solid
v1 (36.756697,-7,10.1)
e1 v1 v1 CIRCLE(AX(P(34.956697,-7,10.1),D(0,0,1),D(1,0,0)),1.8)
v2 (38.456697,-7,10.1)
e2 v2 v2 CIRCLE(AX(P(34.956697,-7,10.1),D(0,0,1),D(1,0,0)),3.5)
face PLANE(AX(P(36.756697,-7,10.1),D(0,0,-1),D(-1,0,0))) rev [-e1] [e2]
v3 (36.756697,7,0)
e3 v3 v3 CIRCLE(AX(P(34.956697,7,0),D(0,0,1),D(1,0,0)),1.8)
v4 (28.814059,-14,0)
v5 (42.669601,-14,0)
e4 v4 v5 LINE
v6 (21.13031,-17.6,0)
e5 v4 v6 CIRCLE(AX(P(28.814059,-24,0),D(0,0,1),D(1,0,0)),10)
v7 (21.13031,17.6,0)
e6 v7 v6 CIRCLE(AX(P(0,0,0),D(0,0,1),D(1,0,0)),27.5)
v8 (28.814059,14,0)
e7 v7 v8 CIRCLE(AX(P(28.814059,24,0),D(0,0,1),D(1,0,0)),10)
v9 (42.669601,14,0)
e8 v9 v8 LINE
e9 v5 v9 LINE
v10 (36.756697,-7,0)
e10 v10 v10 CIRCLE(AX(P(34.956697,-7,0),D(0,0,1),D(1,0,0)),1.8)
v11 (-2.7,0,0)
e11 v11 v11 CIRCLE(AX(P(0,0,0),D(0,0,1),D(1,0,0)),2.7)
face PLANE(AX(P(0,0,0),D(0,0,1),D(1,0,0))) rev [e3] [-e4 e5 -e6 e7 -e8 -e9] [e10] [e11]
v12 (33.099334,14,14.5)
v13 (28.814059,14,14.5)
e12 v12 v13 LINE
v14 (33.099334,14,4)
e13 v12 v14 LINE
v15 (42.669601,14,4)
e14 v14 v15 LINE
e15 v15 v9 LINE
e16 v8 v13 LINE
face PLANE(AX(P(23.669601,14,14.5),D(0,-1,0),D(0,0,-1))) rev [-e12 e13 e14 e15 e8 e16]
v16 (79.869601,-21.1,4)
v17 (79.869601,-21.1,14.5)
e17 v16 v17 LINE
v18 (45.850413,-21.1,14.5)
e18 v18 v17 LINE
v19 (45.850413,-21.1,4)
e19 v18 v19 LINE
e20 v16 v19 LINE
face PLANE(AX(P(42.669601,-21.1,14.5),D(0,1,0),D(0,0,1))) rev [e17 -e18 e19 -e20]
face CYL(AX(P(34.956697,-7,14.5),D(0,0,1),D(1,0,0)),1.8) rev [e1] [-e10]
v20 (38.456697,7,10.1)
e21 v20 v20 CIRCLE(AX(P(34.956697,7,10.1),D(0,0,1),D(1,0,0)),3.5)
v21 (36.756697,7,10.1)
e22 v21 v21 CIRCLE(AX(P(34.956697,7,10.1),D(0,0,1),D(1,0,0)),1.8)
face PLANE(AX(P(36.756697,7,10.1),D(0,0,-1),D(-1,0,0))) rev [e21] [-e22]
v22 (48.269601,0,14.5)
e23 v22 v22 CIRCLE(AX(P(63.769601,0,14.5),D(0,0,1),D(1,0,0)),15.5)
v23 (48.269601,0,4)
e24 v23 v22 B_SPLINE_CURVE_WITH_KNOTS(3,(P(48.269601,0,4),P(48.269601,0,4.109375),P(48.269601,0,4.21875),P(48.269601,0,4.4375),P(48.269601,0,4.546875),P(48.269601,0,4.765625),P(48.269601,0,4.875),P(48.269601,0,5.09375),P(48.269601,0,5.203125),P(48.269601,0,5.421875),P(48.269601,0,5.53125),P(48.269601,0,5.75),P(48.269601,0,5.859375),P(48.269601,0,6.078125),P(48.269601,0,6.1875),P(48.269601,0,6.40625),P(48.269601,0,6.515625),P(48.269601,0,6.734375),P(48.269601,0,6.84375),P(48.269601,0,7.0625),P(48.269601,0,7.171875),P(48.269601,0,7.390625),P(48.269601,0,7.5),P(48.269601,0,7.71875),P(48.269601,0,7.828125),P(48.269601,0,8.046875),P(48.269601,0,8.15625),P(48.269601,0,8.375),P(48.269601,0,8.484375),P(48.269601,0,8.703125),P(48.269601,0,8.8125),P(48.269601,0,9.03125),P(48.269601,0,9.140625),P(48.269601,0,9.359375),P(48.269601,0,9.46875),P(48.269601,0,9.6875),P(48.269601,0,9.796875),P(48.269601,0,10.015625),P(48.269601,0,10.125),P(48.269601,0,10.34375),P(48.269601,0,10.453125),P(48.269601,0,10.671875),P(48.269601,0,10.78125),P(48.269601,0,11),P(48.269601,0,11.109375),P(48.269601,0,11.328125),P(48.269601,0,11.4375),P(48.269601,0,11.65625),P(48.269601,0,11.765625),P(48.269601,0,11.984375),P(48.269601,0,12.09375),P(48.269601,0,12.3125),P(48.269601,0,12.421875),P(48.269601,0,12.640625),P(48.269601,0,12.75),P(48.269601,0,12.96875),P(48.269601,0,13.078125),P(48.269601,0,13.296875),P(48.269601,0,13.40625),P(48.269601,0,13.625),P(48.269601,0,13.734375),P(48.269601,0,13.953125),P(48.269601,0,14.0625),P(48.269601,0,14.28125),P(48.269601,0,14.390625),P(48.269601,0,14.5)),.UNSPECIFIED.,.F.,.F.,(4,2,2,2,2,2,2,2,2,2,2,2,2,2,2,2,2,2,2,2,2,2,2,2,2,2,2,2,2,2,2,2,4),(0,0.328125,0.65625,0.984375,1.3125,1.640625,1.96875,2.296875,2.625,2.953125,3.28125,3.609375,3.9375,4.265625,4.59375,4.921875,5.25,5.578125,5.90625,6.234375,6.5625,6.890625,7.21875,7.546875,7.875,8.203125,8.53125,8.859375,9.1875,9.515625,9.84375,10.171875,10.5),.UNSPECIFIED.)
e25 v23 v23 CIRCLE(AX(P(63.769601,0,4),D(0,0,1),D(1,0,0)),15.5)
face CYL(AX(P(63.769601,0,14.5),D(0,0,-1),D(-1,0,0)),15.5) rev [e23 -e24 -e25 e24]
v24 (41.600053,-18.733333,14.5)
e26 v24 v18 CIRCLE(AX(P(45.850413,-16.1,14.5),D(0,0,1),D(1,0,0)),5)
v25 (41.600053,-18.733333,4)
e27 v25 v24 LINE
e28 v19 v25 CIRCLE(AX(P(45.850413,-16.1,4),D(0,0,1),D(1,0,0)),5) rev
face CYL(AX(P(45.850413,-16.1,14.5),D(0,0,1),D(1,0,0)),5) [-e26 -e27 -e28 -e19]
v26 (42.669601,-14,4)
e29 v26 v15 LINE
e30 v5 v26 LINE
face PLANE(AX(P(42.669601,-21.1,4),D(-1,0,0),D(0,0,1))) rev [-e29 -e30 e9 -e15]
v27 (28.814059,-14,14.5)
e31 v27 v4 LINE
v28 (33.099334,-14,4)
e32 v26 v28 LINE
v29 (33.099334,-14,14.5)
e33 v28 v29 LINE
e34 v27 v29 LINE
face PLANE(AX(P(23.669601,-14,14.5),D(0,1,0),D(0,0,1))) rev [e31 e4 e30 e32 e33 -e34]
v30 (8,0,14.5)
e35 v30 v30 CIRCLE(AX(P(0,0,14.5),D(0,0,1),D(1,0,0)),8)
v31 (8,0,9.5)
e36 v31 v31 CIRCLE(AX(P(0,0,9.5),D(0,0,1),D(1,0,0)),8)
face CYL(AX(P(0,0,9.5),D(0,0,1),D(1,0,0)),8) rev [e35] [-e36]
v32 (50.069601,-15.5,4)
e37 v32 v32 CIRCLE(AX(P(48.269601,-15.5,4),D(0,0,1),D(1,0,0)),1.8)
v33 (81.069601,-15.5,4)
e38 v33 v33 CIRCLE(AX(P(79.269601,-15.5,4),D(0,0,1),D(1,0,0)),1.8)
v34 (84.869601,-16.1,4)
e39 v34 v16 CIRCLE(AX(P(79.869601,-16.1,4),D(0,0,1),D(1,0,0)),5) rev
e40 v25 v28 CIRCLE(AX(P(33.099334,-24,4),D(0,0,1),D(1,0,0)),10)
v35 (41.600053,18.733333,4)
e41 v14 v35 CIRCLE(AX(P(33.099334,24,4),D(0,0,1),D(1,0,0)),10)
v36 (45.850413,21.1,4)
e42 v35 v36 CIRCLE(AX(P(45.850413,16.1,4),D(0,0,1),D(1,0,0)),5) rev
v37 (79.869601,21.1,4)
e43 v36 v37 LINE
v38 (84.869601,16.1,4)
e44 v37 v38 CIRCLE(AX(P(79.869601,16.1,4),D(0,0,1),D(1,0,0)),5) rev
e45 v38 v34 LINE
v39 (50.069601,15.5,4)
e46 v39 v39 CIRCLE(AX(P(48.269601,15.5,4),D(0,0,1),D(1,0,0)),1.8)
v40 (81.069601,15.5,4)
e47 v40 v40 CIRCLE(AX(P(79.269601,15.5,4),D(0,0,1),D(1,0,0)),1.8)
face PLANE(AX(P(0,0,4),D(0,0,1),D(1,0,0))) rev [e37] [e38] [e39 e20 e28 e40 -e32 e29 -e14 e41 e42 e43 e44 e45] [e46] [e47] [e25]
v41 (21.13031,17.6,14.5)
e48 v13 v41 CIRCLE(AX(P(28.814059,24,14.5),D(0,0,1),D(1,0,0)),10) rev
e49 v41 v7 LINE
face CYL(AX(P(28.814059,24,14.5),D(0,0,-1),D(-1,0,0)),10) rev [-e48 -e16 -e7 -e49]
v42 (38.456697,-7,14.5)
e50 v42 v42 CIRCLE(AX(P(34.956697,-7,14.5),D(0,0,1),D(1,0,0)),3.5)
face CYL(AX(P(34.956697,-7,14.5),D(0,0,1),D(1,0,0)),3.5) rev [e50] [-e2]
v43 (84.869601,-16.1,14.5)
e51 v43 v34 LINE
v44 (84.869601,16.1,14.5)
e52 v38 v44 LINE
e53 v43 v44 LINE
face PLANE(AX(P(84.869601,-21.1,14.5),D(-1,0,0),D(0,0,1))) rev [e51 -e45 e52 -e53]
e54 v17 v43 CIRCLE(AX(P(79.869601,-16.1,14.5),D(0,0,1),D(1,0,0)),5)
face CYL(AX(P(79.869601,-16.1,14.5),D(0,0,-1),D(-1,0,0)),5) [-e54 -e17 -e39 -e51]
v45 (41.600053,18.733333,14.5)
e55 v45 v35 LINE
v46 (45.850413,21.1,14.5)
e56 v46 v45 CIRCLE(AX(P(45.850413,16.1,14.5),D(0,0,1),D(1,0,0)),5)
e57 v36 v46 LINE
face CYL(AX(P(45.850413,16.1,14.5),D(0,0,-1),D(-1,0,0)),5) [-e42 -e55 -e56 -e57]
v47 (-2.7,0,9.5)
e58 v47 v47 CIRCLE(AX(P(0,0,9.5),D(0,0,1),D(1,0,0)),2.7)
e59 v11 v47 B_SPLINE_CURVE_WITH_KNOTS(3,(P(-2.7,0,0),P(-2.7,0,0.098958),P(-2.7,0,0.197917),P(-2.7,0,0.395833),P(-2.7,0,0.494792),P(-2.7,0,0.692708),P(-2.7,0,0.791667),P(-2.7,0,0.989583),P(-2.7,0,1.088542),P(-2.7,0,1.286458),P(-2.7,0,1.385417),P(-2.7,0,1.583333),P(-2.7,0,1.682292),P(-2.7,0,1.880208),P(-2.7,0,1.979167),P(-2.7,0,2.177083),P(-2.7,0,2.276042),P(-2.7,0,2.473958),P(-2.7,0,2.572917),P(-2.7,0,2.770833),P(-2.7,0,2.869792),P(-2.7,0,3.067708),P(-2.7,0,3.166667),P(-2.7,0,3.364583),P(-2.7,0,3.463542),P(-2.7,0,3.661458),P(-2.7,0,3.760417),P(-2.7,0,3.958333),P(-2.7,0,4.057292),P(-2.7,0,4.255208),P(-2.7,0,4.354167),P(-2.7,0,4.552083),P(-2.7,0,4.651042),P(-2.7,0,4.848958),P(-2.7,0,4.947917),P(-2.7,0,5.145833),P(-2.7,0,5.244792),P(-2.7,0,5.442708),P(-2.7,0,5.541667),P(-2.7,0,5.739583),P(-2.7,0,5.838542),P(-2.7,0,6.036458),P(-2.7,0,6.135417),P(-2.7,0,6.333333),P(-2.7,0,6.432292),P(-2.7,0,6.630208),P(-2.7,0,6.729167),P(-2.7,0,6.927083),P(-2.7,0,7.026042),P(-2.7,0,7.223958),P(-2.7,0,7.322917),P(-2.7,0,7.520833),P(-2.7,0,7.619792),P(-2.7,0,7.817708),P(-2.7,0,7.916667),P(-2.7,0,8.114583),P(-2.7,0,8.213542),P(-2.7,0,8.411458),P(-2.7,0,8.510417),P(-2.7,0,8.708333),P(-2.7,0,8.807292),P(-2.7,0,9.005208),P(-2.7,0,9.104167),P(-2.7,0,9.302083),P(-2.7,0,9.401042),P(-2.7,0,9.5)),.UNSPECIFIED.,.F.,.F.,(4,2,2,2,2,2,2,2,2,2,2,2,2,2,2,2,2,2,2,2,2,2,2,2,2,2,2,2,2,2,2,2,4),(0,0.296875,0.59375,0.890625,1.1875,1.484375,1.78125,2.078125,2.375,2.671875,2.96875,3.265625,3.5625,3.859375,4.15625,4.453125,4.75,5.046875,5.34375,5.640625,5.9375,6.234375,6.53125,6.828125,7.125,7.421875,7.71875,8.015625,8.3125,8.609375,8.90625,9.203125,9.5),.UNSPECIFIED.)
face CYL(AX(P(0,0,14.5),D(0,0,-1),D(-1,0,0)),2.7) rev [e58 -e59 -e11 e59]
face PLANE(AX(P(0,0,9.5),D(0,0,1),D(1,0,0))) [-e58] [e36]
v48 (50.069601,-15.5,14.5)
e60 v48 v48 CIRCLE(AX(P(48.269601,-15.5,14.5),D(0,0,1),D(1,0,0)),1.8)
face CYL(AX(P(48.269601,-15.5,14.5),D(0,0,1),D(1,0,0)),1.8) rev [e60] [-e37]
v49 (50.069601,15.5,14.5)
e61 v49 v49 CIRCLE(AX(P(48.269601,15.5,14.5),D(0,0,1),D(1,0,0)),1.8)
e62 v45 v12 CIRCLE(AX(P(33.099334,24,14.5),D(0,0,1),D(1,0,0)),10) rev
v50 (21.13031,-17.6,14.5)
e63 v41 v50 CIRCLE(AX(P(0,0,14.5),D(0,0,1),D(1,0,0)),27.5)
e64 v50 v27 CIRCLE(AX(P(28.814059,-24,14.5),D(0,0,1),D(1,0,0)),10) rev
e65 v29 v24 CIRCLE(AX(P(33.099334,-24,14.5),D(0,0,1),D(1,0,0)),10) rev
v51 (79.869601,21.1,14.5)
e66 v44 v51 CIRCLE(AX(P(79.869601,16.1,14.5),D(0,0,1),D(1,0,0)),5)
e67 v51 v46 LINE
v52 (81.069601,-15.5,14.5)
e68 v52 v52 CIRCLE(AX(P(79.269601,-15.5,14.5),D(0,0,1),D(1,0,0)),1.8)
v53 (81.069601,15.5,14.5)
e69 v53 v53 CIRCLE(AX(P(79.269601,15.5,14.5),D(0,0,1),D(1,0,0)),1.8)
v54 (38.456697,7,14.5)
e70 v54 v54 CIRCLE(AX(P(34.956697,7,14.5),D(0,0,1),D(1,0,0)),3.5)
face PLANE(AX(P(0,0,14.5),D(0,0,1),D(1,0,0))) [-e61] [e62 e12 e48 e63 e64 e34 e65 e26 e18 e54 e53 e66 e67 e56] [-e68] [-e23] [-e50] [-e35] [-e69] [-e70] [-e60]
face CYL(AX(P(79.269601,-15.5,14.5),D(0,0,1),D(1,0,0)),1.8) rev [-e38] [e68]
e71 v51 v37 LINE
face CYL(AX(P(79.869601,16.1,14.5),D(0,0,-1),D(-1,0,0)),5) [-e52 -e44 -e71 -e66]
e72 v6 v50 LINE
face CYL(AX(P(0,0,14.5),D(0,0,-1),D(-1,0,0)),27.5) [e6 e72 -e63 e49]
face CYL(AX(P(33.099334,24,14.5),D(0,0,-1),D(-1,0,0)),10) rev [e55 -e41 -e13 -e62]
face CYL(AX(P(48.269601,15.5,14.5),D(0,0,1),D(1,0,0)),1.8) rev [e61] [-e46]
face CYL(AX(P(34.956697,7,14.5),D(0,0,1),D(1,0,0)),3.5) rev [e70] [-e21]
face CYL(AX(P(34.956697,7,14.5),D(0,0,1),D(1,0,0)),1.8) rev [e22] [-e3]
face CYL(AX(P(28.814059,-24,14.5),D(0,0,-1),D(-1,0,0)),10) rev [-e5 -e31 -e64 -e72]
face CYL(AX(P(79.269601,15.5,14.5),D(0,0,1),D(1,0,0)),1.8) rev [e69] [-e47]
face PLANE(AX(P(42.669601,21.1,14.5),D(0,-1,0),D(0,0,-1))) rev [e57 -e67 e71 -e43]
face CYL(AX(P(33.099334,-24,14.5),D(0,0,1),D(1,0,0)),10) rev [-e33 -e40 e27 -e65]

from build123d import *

# Parameters (mm, degrees)
SKETCH1_R                                            = 15.5
SKETCH1_R_2                                          = 1.5
SKETCH1_R_3                                          = 2.7
BOSS_EXTRUDE1_DEPTH                                  = 14.5
SKETCH2_W                                            = 42.2
SKETCH2_H                                            = 42.2
CUT_EXTRUDE1_DEPTH                                   = 4
SKETCH3_R                                            = 8
CUT_EXTRUDE2_DEPTH                                   = 5
FILLET2_R                                            = 10
TALADRO_DE_MARGEN_PARA_M31_D                         = 3.6
SKETCH7_R                                            = 1.5
CUT_EXTRUDE3_DEPTH                                   = 91.38445183
REFRENTADO_PARA_TORNILLO_CON_CABEZA_TRON_D           = 3.6
REFRENTADO_PARA_TORNILLO_CON_CABEZA_TRON_CBORE_D     = 7
REFRENTADO_PARA_TORNILLO_CON_CABEZA_TRON_CBORE_DEPTH = 4.4
FILLET3_R                                            = 5


with BuildPart() as part:
    # Sketch1 → Boss-Extrude1 (new body)
    with BuildSketch(Plane.XY):
        with BuildLine():
            Line((42.669600757, 14), (42.669600757, 21.1))
            Line((42.669600757, 21.1), (84.869600757, 21.1))
            Line((84.869600757, 21.1), (84.869600757, -21.1))
            Line((84.869600757, -21.1), (42.669600757, -21.1))
            Line((42.669600757, -21.1), (42.669600757, -14))
            Line((42.669600757, -14), (23.669600757, -14))
            ThreePointArc((23.669600757, -14), (-27.5, 0), (23.669600757, 14))
            Line((23.669600757, 14), (42.669600757, 14))
        make_face()
        with Locations(Location((63.769600757, 0, 0), (0, 0, 180))):
            Circle(SKETCH1_R, mode=Mode.SUBTRACT)
        with Locations(Location((48.269600757, 15.5, 0), (0, 0, 180))):
            Circle(SKETCH1_R_2, mode=Mode.SUBTRACT)
        with Locations(Location((79.269600757, 15.5, 0), (0, 0, 180))):
            Circle(SKETCH1_R_2, mode=Mode.SUBTRACT)
        with Locations(Location((79.269600757, -15.5, 0), (0, 0, 180))):
            Circle(SKETCH1_R_2, mode=Mode.SUBTRACT)
        with Locations(Location((48.269600757, -15.5, 0), (0, 0, 180))):
            Circle(SKETCH1_R_2, mode=Mode.SUBTRACT)
        with Locations(Location((0, 0, 0), (0, 0, 180))):
            Circle(SKETCH1_R_3, mode=Mode.SUBTRACT)
    extrude(amount=BOSS_EXTRUDE1_DEPTH)

    # Sketch2 → Cut-Extrude1 (cut)
    with BuildSketch(Plane(origin=(0, 0, 0), x_dir=(-1, 0, 0), z_dir=(0, 0, -1))):
        with Locations((-63.769600757, 0)):
            Rectangle(SKETCH2_W, SKETCH2_H)
    extrude(amount=-CUT_EXTRUDE1_DEPTH, mode=Mode.SUBTRACT)

    # Sketch3 → Cut-Extrude2 (cut)
    with BuildSketch(Plane.XY.offset(14.5)):
        Circle(SKETCH3_R)
    extrude(amount=-CUT_EXTRUDE2_DEPTH, mode=Mode.SUBTRACT)

    # Fillet2
    # the kernel refuses this fillet: 10 mm, written as the material it adds along each edge
    with BuildSketch(Plane(origin=(42.669600757, -14, 4), x_dir=(-1, 0, 0), z_dir=(0, 0, 1))) as fillet2_piece_1:
        with BuildLine():
            CenterArc((9.570266454, 10), FILLET2_R, 196.857956022, 73.142043978)
            Line((0, 7.1), (0, 0))
            Line((0, 0), (9.570266454, 0))
        make_face()
    extrude(amount=10.5)
    with BuildSketch(Plane(origin=(42.669600757, 14, 4), x_dir=(-1, 0, 0), z_dir=(0, 0, 1))) as fillet2_piece_2:
        with BuildLine():
            CenterArc((9.570266454, -10), FILLET2_R, 90, 73.142043978)
            Line((0, -7.1), (0, 0))
            Line((0, 0), (9.570266454, 0))
        make_face()
    extrude(amount=10.5)
    with BuildSketch(Plane(origin=(23.669600757, -14, 0), x_dir=(-0.5763974746684583, -0.8171694751982751, 0), z_dir=(0, 0, 1))) as fillet2_piece_3:
        with BuildLine():
            CenterArc((5.206441973, 9.967869045), FILLET2_R, 215.197557054, 50.2081805)
            Line((-2.965252779, 4.203894298), (0, 0))
            ThreePointArc((0, 0), (2.20272545, 0.088360126), (4.4054509, 0))
        make_face()
    extrude(amount=14.5)
    with BuildSketch(Plane(origin=(23.669600757, 14, 0), x_dir=(1, 0, 0), z_dir=(0, 0, 1))) as fillet2_piece_4:
        with BuildLine():
            CenterArc((5.144458311, 10), FILLET2_R, 219.7918195, 50.2081805)
            ThreePointArc((-2.539290774, 3.6), (-1.197440189, 1.850930553), (0, 0))
            Line((0, 0), (5.144458311, 0))
        make_face()
    extrude(amount=14.5)

    # Taladro de margen para M31 (through all)
    with Locations(Plane.XY.offset(14.5)):
        with Locations((79.269600757, -15.5), (79.269600757, 15.5), (48.269600757, 15.5), (48.269600757, -15.5)):
            Hole(TALADRO_DE_MARGEN_PARA_M31_D / 2)

    # Sketch7 → Cut-Extrude3 (cut, through all)
    with BuildSketch(Plane.XY.offset(14.5)):
        with Locations((34.956696686, 7)):
            Circle(SKETCH7_R)
        with Locations((34.956696686, -7)):
            Circle(SKETCH7_R)
    extrude(amount=-CUT_EXTRUDE3_DEPTH, mode=Mode.SUBTRACT)

    # Refrentado para tornillo con cabeza troncocónica de M31 (through all)
    with Locations(Plane.XY.offset(14.5)):
        with Locations((34.956696686, 7), (34.956696686, -7)):
            CounterBoreHole(REFRENTADO_PARA_TORNILLO_CON_CABEZA_TRON_D / 2, REFRENTADO_PARA_TORNILLO_CON_CABEZA_TRON_CBORE_D / 2, REFRENTADO_PARA_TORNILLO_CON_CABEZA_TRON_CBORE_DEPTH)

    # Fillet3
    fillet3_edges = [part.edges().sort_by_distance(p)[0] for p in [
        (84.869600757, -21.1, 9.25),
        (42.669600757, -21.1, 9.25),
        (42.669600757, 21.1, 9.25),
        (84.869600757, 21.1, 9.25),
    ]]
    fillet(fillet3_edges, radius=FILLET3_R)


solid = part.part
